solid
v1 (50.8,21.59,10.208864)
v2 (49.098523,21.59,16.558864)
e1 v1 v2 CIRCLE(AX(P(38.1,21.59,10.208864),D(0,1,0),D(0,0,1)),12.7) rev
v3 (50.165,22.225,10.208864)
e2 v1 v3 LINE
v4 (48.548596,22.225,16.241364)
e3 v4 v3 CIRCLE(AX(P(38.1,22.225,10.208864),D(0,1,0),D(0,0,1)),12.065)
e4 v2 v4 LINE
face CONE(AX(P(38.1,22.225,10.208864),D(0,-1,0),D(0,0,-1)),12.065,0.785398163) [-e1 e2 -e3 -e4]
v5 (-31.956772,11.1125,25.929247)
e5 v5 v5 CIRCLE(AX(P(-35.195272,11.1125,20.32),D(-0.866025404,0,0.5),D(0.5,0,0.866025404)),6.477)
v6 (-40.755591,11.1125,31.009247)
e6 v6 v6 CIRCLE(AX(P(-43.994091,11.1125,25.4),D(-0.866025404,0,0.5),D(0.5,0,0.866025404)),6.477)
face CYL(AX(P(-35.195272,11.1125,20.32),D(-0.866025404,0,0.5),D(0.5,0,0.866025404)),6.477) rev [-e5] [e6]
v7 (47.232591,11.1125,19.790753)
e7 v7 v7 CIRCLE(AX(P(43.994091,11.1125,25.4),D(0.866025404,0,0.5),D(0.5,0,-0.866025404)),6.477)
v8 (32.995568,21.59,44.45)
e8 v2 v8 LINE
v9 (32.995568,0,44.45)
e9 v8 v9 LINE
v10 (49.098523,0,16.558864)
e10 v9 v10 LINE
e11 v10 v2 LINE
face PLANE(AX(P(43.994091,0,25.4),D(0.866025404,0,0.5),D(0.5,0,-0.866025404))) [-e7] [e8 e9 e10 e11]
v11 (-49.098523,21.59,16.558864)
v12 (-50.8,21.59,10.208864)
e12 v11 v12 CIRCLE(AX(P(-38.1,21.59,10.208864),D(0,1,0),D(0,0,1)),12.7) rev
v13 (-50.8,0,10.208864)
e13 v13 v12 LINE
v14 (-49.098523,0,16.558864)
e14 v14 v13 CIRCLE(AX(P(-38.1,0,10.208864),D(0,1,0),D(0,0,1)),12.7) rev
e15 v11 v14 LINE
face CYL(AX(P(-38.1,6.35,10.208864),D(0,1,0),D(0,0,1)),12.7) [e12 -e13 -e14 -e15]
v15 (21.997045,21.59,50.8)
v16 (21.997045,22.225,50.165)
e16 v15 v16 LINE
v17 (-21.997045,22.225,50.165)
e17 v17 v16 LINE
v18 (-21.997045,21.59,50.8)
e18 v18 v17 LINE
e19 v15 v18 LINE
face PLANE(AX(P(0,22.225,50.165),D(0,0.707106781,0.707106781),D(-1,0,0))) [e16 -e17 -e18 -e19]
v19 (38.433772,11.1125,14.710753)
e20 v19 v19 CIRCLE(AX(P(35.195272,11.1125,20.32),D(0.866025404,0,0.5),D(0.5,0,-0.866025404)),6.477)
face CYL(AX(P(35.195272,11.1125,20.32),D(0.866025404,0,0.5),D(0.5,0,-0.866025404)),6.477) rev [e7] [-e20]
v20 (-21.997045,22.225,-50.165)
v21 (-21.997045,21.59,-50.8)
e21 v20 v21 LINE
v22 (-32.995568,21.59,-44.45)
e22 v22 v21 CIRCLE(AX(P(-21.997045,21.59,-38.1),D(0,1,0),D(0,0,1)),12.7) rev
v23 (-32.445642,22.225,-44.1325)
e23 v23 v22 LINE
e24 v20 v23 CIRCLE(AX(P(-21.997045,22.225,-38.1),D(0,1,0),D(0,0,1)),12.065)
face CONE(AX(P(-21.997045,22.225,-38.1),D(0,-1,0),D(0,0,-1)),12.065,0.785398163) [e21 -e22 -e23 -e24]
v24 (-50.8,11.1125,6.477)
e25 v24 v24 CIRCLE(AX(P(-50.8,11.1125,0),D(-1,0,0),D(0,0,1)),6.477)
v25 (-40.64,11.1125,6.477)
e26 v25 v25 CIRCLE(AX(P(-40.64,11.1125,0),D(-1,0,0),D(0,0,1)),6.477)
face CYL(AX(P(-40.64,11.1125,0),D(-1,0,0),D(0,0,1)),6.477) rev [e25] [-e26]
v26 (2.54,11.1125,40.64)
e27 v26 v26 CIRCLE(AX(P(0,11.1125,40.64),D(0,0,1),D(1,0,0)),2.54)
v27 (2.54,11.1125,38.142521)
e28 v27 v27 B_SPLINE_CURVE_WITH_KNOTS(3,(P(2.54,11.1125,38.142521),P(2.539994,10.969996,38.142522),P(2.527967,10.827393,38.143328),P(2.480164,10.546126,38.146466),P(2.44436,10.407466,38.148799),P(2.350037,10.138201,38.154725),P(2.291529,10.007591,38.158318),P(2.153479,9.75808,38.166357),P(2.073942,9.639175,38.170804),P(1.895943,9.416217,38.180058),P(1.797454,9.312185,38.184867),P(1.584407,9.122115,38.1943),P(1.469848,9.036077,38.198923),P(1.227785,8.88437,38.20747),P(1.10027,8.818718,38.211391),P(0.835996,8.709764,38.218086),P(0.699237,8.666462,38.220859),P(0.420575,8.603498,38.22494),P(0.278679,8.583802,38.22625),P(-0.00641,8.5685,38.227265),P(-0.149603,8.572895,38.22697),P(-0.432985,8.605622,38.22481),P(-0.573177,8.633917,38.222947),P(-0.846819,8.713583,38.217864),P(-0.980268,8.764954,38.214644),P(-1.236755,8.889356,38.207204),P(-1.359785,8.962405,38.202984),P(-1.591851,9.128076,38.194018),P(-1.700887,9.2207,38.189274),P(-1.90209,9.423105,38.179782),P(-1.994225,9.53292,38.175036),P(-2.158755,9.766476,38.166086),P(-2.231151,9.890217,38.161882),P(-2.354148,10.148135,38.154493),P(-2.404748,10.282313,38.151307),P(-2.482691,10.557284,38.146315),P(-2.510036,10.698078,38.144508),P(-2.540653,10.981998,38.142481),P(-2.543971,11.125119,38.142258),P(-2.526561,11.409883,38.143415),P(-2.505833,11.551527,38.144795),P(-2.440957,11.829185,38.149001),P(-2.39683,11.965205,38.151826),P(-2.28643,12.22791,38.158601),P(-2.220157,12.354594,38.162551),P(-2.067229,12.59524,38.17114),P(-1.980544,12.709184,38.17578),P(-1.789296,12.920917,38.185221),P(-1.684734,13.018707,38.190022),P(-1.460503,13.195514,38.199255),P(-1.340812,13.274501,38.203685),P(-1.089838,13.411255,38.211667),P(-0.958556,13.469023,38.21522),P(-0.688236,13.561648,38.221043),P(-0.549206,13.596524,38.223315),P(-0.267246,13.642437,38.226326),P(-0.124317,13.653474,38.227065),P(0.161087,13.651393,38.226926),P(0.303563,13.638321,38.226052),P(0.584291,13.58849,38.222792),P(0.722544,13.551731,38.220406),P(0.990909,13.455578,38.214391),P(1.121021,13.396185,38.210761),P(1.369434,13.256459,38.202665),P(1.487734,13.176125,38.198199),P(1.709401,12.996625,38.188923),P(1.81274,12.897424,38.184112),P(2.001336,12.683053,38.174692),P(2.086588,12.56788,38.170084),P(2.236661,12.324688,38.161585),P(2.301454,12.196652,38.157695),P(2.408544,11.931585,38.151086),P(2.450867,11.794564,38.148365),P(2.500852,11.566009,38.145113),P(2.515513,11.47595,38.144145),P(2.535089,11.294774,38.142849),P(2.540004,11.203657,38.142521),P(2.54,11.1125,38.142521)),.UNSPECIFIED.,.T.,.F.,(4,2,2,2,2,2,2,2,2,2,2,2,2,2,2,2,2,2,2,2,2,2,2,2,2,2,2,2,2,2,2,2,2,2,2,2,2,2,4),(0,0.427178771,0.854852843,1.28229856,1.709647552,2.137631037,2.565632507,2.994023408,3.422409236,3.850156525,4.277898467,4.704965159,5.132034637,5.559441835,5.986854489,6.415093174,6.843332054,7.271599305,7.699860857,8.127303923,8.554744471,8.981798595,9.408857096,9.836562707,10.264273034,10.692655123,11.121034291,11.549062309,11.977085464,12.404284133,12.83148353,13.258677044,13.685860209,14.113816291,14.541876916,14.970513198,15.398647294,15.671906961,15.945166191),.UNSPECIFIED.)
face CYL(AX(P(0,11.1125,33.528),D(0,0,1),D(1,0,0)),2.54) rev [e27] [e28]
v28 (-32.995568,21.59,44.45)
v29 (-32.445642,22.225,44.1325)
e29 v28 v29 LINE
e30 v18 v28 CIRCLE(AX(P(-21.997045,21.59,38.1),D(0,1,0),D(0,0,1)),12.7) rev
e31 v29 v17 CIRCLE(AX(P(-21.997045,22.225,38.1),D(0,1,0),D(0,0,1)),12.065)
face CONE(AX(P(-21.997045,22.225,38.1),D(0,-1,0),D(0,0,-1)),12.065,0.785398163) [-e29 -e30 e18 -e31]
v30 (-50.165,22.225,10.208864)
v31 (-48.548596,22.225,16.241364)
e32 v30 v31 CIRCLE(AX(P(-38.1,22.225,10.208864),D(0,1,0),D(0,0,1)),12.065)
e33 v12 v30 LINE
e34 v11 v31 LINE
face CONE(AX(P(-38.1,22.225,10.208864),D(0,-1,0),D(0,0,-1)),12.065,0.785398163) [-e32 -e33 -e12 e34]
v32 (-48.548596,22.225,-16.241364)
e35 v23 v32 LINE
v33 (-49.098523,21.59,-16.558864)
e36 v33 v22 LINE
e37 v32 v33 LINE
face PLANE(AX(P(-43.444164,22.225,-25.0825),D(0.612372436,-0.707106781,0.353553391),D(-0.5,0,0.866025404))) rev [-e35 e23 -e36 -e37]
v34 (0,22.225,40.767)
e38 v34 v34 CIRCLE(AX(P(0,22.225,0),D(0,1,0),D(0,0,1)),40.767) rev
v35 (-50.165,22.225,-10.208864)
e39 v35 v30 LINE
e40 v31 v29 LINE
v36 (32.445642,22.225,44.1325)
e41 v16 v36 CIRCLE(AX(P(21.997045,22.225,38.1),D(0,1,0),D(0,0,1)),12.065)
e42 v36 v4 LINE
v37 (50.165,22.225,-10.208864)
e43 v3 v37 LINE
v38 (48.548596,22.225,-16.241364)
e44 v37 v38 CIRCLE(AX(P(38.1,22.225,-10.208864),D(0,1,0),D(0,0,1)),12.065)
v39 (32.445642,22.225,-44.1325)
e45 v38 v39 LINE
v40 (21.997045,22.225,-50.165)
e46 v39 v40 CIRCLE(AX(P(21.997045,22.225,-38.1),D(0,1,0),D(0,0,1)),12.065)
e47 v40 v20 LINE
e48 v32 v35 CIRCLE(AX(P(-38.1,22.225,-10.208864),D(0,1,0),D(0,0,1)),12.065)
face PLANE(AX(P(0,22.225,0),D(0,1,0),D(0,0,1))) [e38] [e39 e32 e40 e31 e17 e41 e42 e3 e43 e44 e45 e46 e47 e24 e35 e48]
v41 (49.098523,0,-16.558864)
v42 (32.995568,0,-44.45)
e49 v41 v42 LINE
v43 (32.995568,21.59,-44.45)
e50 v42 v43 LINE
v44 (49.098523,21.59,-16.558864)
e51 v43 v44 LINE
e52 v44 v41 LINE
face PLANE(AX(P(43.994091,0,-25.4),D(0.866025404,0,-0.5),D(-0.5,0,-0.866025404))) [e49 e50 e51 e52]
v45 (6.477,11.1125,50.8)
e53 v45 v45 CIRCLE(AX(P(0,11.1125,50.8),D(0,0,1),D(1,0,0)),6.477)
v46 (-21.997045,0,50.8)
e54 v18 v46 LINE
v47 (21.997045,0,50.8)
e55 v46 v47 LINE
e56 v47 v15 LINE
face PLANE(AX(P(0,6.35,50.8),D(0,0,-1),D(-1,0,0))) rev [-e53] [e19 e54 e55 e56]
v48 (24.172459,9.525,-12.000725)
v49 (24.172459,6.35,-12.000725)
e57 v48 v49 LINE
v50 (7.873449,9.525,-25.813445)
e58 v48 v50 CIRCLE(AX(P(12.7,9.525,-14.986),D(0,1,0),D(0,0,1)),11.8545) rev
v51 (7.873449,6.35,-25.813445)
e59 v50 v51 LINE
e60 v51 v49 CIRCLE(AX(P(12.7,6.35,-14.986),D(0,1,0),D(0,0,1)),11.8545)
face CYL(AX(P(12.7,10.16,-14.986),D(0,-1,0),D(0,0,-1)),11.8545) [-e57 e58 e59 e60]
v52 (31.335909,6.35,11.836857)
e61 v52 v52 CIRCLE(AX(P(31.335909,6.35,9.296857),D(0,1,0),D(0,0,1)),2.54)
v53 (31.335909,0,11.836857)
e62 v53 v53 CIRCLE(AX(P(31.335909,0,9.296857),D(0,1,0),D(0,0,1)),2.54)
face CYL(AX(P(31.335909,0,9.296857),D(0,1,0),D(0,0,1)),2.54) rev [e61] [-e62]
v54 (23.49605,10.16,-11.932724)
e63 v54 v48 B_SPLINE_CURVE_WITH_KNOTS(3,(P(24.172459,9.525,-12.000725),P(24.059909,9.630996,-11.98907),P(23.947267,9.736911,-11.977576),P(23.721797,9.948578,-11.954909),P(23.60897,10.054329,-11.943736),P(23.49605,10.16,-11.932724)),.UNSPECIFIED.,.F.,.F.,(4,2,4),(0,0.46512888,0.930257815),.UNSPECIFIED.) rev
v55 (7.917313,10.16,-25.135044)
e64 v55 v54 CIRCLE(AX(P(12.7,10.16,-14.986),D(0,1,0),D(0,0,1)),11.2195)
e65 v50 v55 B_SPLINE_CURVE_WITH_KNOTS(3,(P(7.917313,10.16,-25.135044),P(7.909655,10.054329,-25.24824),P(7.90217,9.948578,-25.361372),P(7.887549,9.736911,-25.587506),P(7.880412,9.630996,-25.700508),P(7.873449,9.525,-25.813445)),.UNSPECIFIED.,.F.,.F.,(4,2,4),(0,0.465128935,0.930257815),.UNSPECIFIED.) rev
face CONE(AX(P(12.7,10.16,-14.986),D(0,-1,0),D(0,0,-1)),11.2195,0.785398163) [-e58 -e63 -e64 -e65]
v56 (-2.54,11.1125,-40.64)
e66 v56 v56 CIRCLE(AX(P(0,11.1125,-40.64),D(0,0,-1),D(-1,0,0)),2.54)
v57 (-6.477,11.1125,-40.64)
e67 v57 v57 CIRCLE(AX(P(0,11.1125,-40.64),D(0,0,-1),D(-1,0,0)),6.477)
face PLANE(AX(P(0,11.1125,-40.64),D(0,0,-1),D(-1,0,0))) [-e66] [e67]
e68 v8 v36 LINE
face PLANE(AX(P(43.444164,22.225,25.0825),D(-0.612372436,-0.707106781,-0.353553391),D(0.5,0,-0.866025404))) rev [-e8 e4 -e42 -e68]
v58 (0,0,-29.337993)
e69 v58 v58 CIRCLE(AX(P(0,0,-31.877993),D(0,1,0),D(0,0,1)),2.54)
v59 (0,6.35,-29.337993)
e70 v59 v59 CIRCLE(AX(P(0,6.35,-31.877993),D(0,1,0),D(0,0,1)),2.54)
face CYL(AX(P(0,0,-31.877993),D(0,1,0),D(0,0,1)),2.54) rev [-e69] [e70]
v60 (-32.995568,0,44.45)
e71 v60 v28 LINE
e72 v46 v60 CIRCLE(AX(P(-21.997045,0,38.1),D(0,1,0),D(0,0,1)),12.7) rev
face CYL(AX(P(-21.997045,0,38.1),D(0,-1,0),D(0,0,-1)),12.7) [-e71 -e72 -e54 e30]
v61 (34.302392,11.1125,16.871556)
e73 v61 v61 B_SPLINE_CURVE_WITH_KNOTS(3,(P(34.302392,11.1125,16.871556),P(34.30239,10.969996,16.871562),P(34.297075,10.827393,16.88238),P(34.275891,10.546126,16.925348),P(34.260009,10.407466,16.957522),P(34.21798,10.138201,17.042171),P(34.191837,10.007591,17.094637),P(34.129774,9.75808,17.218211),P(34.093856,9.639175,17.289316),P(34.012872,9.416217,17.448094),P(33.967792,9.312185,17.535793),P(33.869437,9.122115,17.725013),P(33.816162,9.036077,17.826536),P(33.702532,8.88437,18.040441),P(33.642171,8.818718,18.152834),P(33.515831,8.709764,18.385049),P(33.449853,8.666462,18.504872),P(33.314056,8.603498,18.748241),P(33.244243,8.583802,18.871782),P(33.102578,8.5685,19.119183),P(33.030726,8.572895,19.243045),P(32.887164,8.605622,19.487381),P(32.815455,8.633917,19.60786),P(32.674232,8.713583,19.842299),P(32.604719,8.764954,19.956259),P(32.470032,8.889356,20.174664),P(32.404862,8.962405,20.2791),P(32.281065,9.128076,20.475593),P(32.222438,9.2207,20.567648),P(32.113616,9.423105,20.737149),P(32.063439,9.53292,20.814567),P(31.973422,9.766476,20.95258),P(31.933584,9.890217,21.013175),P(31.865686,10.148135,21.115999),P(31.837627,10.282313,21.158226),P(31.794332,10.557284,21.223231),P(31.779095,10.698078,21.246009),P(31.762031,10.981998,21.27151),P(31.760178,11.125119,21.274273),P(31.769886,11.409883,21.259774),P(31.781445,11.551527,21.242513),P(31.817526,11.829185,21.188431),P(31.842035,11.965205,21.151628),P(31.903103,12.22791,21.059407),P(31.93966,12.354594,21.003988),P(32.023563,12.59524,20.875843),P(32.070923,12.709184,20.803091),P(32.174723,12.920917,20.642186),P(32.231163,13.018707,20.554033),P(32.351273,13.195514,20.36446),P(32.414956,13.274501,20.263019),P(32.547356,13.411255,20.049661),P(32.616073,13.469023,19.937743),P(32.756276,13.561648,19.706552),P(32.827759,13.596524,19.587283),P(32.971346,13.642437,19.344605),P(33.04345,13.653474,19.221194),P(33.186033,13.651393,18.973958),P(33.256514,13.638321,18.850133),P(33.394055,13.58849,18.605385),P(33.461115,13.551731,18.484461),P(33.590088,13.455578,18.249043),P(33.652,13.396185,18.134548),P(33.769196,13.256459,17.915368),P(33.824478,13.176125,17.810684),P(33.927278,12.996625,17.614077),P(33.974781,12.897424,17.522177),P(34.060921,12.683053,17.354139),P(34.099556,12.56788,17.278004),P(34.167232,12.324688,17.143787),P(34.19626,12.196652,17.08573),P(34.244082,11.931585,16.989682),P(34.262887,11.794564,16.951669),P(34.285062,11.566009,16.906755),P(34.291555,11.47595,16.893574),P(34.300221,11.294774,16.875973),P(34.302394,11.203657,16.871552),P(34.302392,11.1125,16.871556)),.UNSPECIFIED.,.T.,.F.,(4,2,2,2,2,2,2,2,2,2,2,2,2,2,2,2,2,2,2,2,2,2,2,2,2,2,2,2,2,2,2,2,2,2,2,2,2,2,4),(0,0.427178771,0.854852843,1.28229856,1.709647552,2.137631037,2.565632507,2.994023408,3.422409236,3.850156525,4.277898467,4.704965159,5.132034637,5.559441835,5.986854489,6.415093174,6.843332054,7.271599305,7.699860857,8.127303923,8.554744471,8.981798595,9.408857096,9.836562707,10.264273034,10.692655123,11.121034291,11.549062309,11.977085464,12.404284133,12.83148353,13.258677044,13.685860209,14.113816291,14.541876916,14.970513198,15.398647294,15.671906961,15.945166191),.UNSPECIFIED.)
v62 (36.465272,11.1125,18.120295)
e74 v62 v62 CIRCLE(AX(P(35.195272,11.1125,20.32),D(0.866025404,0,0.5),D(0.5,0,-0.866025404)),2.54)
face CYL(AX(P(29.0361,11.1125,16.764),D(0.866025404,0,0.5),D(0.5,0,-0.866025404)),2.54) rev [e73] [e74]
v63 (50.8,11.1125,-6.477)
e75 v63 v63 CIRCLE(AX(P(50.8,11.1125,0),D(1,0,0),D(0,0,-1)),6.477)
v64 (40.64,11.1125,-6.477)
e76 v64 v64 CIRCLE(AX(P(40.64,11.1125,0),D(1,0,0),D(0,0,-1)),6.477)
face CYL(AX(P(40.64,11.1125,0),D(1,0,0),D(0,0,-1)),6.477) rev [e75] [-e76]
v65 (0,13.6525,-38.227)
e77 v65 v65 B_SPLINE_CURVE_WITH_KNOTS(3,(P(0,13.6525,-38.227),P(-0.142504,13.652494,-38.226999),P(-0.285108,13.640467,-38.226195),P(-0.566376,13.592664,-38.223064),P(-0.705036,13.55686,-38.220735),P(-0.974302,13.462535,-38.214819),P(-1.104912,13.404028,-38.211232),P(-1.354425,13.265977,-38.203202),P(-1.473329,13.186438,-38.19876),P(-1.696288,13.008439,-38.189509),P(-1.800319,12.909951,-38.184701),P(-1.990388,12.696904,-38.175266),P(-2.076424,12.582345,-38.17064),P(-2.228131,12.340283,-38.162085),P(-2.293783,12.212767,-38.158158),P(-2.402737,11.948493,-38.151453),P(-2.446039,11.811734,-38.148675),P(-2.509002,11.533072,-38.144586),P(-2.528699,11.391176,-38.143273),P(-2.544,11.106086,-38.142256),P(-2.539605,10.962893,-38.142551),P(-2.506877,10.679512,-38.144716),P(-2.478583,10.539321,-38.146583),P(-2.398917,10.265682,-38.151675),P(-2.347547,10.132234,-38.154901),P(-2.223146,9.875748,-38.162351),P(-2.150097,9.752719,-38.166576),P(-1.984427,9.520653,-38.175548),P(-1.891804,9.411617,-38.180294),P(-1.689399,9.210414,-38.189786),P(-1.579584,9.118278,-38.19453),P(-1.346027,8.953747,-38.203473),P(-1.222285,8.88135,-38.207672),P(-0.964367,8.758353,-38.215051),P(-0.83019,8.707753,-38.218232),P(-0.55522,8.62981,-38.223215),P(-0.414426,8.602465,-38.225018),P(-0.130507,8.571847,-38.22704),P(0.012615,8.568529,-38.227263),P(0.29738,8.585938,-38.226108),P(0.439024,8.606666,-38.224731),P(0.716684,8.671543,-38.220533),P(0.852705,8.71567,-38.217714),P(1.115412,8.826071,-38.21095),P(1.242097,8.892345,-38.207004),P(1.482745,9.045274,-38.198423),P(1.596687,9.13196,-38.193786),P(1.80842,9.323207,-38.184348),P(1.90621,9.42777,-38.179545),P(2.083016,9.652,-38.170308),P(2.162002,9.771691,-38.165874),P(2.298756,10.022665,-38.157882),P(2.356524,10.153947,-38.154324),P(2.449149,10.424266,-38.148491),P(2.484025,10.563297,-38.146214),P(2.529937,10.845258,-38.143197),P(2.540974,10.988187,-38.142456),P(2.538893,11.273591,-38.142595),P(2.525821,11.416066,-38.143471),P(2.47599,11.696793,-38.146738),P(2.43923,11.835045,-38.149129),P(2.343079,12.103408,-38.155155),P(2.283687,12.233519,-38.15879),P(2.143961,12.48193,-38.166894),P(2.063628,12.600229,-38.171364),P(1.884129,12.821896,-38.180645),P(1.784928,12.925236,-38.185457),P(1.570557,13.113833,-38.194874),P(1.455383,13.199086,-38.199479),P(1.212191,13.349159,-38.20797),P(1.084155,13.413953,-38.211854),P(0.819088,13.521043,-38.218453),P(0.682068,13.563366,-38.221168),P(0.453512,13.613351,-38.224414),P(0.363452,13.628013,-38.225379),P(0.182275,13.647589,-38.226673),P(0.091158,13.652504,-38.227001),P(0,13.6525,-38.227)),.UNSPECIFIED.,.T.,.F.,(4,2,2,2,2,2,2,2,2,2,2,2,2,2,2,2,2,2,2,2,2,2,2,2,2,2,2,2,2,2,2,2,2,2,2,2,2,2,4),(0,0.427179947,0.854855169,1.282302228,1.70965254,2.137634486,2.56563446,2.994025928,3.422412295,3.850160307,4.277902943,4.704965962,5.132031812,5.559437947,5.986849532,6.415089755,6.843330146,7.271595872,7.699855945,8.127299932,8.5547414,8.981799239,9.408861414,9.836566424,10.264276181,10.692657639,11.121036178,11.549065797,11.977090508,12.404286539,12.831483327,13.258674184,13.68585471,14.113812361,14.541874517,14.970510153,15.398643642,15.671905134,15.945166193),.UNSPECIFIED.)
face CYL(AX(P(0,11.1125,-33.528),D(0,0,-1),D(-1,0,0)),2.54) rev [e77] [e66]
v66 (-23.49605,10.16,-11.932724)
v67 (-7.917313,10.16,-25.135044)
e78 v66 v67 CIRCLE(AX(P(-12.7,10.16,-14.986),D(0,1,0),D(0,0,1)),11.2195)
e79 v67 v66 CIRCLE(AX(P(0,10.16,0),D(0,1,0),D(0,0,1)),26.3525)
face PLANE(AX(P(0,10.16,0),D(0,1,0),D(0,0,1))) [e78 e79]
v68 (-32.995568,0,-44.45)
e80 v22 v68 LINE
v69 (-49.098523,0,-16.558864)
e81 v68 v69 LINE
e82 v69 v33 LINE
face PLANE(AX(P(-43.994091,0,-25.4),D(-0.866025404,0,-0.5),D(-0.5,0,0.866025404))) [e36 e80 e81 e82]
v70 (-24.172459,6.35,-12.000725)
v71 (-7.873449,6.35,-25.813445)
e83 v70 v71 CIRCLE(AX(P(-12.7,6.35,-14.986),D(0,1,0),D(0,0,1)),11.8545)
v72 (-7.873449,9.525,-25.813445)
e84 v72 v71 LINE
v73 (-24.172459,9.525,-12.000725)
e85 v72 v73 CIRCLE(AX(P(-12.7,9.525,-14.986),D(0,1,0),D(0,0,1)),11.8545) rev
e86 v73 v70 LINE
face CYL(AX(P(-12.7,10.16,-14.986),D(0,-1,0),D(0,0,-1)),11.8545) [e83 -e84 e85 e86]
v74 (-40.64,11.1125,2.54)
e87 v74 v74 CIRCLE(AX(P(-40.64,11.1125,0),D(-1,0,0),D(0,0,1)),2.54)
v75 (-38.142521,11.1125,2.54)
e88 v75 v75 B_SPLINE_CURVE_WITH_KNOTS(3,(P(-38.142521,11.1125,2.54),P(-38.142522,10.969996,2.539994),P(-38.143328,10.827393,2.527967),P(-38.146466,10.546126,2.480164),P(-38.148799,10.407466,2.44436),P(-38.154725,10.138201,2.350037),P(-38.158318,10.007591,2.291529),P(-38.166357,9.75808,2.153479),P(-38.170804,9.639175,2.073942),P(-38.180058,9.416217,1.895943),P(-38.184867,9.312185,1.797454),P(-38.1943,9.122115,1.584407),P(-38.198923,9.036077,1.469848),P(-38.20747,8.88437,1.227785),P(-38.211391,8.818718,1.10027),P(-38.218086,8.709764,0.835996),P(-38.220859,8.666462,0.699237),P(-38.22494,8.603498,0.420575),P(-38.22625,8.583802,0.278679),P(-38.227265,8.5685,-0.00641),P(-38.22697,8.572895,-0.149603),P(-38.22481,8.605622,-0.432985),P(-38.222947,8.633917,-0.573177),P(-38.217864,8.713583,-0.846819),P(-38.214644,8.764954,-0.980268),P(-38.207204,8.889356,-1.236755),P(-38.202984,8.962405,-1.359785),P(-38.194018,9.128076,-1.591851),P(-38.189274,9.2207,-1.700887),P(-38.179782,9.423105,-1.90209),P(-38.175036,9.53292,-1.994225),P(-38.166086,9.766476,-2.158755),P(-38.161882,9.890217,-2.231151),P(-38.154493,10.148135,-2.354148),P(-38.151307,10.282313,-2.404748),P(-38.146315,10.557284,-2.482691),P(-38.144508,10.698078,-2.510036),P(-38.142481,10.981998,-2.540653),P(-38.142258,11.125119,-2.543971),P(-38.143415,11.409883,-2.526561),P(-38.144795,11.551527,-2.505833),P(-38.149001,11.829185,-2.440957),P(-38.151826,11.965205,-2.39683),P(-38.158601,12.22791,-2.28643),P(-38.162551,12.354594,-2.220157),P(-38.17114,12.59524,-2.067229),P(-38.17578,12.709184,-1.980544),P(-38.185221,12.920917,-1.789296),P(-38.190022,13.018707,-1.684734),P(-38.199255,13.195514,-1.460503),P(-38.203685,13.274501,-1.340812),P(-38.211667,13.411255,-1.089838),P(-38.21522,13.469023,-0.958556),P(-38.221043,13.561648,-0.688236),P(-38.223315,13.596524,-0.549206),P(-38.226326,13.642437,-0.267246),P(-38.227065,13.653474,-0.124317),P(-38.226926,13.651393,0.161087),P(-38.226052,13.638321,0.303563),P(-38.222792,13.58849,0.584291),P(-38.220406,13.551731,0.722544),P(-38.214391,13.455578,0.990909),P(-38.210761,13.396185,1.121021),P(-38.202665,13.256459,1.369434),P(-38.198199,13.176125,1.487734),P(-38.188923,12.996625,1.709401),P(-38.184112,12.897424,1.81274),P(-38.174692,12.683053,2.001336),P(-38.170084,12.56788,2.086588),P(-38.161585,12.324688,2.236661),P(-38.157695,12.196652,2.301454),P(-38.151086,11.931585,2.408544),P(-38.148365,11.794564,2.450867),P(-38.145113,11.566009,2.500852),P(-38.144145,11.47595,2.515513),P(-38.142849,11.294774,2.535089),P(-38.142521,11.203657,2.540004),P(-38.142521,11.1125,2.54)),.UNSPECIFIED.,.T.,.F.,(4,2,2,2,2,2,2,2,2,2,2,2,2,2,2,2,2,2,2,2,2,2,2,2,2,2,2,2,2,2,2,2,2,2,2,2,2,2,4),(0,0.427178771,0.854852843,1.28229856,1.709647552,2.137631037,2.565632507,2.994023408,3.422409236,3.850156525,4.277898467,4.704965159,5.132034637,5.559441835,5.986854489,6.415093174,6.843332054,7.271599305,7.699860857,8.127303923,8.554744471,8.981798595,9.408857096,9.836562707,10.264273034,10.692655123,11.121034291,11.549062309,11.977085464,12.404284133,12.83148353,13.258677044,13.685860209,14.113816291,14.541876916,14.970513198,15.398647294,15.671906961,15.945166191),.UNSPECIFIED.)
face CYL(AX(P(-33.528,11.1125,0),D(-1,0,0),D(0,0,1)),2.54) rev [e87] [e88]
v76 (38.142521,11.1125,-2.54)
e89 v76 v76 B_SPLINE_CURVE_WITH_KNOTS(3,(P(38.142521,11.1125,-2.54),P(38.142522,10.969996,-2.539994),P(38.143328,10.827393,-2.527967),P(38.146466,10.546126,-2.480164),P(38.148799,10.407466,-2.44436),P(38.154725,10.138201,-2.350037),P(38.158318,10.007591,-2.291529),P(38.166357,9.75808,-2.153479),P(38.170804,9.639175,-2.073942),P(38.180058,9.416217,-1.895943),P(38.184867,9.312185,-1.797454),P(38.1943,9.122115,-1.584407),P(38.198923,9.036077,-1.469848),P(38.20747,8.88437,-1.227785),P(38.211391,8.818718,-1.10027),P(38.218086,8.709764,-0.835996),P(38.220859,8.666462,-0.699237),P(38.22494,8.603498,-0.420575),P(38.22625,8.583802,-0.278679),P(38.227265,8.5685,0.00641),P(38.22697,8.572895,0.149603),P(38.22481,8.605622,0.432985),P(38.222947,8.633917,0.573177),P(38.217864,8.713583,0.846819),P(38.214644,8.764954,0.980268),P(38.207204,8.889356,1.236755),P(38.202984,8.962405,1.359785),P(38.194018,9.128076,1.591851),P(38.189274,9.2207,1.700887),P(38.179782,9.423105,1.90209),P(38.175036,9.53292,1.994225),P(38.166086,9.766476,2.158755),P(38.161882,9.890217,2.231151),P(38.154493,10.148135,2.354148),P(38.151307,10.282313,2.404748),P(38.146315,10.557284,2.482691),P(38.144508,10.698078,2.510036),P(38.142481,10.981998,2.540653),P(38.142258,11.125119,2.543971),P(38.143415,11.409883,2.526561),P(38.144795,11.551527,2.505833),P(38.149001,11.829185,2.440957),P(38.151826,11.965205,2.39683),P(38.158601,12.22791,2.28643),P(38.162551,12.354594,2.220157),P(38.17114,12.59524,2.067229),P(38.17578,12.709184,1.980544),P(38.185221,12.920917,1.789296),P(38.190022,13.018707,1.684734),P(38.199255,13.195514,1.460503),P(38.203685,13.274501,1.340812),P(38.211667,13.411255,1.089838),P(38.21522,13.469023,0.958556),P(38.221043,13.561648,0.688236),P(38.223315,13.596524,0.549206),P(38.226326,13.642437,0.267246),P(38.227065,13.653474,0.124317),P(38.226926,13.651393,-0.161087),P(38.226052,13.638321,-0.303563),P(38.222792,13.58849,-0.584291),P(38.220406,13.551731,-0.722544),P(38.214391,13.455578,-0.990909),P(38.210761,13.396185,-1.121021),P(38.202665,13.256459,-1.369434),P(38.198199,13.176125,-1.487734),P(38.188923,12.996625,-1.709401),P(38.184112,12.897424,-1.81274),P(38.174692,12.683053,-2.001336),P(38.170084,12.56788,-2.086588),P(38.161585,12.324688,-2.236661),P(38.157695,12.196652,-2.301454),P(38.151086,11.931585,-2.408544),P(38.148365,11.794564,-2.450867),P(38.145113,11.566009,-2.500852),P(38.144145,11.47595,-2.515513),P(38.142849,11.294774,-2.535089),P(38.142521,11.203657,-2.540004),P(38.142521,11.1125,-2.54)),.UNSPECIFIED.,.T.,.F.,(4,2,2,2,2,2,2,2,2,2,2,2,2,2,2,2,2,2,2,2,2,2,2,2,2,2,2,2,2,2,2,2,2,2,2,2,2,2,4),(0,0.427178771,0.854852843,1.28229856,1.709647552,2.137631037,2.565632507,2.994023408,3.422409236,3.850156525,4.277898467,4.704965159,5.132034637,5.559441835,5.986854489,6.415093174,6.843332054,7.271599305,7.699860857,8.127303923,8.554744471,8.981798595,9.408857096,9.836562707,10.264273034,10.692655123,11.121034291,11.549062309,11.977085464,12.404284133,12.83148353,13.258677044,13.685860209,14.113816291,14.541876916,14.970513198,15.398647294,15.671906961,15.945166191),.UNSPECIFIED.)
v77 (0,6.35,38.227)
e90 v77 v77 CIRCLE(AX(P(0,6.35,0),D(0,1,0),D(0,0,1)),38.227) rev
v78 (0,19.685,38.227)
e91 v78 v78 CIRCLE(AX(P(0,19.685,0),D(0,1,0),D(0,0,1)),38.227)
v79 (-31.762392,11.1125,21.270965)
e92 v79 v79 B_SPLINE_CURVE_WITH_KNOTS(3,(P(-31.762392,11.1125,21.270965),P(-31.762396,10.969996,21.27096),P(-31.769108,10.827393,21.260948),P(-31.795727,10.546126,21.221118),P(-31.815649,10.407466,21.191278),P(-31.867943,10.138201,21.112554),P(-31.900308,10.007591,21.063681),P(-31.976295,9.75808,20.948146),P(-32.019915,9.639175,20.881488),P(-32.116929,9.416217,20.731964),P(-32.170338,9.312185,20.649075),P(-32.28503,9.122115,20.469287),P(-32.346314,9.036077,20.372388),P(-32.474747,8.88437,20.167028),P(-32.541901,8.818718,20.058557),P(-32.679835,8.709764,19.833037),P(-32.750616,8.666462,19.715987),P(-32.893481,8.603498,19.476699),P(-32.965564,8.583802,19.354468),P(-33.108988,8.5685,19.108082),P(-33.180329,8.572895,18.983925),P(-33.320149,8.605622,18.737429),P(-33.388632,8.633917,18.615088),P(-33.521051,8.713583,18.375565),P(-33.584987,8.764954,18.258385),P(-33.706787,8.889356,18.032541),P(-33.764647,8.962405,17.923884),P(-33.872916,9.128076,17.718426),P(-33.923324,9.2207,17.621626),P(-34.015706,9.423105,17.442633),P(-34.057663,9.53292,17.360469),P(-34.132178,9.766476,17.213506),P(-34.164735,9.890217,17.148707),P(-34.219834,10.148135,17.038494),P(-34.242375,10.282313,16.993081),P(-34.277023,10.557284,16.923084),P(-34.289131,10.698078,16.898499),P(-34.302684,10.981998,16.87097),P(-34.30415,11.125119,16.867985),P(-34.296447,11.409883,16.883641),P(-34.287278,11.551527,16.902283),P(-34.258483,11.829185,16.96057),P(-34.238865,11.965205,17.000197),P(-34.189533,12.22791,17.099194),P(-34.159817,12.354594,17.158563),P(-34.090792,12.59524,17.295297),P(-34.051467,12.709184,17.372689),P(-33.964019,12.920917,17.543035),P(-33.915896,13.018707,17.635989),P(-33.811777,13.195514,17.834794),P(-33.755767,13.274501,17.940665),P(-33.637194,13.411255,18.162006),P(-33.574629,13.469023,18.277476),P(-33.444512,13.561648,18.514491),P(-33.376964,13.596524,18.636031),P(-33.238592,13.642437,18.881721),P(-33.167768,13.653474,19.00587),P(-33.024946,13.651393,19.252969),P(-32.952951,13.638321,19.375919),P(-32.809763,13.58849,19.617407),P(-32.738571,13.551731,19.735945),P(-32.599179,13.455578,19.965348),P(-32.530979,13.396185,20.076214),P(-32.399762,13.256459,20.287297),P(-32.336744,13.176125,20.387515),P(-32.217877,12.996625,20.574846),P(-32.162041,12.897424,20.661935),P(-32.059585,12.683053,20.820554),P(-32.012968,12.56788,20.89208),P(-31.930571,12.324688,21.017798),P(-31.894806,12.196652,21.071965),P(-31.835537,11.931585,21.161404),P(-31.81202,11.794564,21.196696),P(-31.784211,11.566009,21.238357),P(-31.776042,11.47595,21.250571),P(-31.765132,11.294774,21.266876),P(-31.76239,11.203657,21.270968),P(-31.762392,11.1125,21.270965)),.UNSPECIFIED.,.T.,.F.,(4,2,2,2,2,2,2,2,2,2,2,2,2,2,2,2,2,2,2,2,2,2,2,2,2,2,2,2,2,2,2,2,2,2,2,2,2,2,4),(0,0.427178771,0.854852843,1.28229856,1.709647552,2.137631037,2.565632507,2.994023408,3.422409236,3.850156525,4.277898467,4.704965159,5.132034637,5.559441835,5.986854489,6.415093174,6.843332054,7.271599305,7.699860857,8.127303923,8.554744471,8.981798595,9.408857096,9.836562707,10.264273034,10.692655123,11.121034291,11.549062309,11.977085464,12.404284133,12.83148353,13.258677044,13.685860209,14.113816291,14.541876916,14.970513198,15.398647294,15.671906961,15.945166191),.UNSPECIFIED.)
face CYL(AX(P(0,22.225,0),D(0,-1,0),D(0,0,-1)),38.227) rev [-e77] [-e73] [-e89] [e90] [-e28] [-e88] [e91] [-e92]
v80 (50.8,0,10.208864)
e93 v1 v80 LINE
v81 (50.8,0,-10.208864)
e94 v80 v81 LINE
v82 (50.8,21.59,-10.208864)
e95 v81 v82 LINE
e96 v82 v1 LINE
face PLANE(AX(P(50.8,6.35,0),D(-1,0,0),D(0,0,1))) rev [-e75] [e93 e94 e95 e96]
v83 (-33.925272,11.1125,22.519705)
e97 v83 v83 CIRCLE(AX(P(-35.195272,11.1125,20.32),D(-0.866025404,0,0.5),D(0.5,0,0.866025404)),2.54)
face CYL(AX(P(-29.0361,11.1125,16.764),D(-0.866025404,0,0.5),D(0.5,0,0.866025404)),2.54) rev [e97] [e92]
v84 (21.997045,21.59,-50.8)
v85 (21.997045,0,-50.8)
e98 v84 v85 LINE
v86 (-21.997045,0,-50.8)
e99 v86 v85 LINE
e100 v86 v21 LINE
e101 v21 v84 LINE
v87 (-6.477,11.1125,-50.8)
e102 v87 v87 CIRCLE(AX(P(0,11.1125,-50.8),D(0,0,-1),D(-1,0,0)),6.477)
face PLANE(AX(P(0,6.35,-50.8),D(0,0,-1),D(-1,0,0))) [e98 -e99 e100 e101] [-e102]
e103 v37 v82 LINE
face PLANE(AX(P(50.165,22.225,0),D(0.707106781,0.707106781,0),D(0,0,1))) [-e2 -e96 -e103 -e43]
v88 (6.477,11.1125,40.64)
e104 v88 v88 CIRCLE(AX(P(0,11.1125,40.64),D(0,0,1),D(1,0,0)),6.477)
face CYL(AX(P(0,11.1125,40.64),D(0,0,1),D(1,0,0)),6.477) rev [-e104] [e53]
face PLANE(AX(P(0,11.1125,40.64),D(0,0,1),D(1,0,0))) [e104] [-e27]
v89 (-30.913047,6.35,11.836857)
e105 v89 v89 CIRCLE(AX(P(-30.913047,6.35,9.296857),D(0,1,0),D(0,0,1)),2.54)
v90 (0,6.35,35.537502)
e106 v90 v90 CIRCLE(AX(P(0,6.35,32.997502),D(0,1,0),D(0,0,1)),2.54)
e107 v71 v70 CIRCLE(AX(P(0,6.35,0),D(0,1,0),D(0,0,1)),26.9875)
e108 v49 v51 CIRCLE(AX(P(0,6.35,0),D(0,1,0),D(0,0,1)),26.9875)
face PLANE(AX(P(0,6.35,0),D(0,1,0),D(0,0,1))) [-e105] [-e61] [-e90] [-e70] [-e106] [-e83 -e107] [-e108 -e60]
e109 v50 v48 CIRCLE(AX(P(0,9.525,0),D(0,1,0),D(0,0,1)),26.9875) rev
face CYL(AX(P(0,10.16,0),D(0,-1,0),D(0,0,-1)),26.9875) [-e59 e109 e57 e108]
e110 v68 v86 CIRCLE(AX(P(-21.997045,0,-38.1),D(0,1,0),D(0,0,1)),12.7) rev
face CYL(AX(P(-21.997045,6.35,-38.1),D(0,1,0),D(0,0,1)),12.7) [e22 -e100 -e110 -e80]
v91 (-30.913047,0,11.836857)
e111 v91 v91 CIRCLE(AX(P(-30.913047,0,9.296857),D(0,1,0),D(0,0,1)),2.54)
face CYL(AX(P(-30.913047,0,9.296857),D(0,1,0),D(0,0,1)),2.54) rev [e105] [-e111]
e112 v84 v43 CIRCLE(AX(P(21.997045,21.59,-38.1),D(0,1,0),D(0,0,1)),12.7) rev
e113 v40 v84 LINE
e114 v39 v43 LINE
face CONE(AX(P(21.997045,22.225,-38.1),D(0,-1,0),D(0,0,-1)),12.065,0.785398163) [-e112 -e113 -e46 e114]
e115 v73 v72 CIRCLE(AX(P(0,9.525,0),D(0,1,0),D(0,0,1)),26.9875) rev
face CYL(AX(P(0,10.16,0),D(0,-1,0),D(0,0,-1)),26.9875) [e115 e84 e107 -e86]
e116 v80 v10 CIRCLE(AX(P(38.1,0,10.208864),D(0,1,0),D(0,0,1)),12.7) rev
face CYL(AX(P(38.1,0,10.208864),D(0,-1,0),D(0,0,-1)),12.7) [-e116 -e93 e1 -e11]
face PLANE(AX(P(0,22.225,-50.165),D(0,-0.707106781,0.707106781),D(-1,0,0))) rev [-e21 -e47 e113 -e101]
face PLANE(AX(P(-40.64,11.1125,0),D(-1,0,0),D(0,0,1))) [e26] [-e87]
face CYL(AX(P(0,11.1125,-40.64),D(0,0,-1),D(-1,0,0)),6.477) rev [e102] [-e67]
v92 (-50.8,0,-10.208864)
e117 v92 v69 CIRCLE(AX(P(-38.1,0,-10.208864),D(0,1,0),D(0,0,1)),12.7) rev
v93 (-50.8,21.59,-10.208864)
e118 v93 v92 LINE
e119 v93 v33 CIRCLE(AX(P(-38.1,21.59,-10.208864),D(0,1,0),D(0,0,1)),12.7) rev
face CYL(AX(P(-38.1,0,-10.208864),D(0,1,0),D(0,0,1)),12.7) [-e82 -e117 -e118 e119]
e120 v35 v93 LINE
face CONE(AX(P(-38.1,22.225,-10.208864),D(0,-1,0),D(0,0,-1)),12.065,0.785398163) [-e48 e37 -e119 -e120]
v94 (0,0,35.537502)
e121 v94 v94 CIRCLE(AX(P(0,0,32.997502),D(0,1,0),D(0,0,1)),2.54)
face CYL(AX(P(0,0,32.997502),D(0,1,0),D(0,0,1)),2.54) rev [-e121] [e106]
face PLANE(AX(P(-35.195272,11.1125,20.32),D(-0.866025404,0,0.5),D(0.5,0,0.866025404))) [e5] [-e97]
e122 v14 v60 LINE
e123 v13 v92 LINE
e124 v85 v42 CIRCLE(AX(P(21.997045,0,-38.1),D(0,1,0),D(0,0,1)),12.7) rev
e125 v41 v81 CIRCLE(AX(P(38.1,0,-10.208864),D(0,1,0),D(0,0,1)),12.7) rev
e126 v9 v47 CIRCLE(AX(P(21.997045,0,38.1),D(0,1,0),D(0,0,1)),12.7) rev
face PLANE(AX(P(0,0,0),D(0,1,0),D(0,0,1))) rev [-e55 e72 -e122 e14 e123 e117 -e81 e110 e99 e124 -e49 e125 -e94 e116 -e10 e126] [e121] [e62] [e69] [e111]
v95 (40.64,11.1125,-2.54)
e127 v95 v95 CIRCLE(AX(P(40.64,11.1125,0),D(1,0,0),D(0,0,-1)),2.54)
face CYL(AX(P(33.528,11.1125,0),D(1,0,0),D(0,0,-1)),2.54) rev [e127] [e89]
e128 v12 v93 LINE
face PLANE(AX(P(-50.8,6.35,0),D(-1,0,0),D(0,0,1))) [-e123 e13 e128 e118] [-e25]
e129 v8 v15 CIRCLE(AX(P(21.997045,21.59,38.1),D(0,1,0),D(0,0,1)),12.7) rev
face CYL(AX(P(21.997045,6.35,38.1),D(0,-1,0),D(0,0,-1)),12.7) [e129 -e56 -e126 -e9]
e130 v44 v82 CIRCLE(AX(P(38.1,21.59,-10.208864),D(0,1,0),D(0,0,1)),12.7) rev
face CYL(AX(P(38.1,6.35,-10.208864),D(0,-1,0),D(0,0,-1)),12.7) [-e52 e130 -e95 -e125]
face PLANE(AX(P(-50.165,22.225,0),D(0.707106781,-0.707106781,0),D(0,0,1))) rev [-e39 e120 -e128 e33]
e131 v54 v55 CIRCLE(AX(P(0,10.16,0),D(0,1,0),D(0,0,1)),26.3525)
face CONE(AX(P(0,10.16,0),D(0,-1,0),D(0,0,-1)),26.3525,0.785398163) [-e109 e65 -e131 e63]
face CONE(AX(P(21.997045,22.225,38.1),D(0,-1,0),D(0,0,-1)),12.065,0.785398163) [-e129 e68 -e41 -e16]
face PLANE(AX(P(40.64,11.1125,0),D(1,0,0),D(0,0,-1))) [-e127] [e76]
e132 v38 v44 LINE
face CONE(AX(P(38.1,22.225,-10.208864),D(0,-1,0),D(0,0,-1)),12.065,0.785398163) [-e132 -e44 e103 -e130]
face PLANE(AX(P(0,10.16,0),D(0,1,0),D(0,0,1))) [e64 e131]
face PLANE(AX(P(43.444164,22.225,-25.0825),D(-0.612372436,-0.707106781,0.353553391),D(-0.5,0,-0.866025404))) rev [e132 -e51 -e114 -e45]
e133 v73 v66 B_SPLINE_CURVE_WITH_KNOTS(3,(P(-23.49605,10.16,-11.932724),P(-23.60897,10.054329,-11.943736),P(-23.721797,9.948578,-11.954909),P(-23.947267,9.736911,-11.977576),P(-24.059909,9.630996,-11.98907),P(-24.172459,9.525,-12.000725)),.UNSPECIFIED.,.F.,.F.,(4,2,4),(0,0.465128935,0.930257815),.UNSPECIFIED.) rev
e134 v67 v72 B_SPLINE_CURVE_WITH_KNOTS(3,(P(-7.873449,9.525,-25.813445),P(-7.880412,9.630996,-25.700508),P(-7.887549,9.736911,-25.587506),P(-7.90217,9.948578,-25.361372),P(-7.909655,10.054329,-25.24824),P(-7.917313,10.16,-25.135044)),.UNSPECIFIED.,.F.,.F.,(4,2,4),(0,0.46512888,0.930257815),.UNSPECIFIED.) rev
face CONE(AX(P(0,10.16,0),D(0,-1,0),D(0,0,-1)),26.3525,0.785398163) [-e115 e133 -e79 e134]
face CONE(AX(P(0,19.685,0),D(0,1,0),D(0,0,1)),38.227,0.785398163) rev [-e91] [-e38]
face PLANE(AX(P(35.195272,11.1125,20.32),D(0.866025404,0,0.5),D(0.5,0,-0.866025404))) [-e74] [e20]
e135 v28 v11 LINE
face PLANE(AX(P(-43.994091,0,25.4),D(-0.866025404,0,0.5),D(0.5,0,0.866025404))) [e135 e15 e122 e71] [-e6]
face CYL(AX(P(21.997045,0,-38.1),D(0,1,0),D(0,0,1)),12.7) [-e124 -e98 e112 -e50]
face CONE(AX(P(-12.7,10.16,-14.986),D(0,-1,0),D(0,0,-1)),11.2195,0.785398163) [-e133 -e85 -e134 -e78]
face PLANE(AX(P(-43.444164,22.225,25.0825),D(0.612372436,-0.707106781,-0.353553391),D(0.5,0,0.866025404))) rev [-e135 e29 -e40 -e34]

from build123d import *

# Parameters (mm, degrees)
SKETCH1_W               = 101.6
SKETCH1_H               = 101.6
SKETCH1_R               = 38.394
SKETCH1_R_2             = 3.175
SKETCH1_R_3             = 11.8745
SKETCH1_R_4             = 4.1275
BOSS_EXTRUDE1_DEPTH     = 6.35
SKETCH2_W               = 101.6
SKETCH2_H               = 101.6
SKETCH2_R               = 38.227
BOSS_EXTRUDE2_DEPTH     = 15.875
BOSS_EXTRUDE3_DEPTH     = 3.81
SKETCH8_R               = 6.477
CUT_EXTRUDE1_DEPTH      = 10.16
CUT_EXTRUDE5_DEPTH      = 76.201267443
CIRPATTERN1_START       = 40.64
CIRPATTERN1_OUTLINE_R   = 6.477
CIRPATTERN1_DEPTH       = 10.16
CIRPATTERN1_START_2     = -50.8
CIRPATTERN1_2_OUTLINE_R = 6.477
CIRPATTERN1_2_DEPTH     = 10.16
CIRPATTERN1_3_OUTLINE_R = 6.477
CIRPATTERN1_3_DEPTH     = 10.16
CIRPATTERN1_4_OUTLINE_R = 6.477
CIRPATTERN1_4_DEPTH     = 10.16
CIRPATTERN1_5_OUTLINE_R = 6.477
CIRPATTERN1_5_DEPTH     = 10.16
SKETCH13_R              = 2.54
CUT_EXTRUDE4_DEPTH      = 17.272
CIRPATTERN4_START       = 38.142521171
CIRPATTERN4_OUTLINE_R   = 2.54
CIRPATTERN4_DEPTH       = 2.497478829
CIRPATTERN4_START_2     = -40.64
CIRPATTERN4_2_OUTLINE_R = 2.54
CIRPATTERN4_2_DEPTH     = 81.28
CIRPATTERN4_3_OUTLINE_R = 2.54
CIRPATTERN4_3_DEPTH     = 2.497478829
CIRPATTERN4_4_OUTLINE_R = 2.54
CIRPATTERN4_4_DEPTH     = 2.497478829
SKETCH12_R              = 2.54
CUT_EXTRUDE3_DEPTH      = 74.575101958
FILLET1_R               = 12.7
CHAMFER1_SIZE           = 2.54
CHAMFER2_SIZE           = 0.635
CHAMFER3_SIZE           = 0.635


# Read off the part's stored shape, not the designer's step: Boss-Extrude3, CirPattern1, CirPattern4
with BuildPart() as part:
    # Sketch1 → Boss-Extrude1 (new body)
    # profile 1 of 9: a face of its own
    with BuildSketch(Plane(origin=(0, 0, 0), x_dir=(1, 0, 0), z_dir=(0, 1, 0))):
        Rectangle(SKETCH1_W, SKETCH1_H)
        Circle(SKETCH1_R, mode=Mode.SUBTRACT)
    # profile 2 of 9: a face of its own
    with BuildSketch(Plane(origin=(0, 0, 0), x_dir=(1, 0, 0), z_dir=(0, 1, 0))):
        Circle(SKETCH1_R)
        with Locations((0, 30.226)):
            Circle(SKETCH1_R_2, mode=Mode.SUBTRACT)
        with Locations((12.7, 20.066)):
            Circle(SKETCH1_R_3, mode=Mode.SUBTRACT)
        with Locations((0, 9.906)):
            Circle(SKETCH1_R_2, mode=Mode.SUBTRACT)
        with Locations((0, -14.605)):
            Circle(SKETCH1_R_4, mode=Mode.SUBTRACT)
        with Locations((-12.7, 20.066)):
            Circle(SKETCH1_R_3, mode=Mode.SUBTRACT)
        with Locations((25.4, 2.6162)):
            Circle(SKETCH1_R_2, mode=Mode.SUBTRACT)
        with Locations((-25.4, 2.6162)):
            Circle(SKETCH1_R_2, mode=Mode.SUBTRACT)
    # profile 3 of 9: a face of its own
    with BuildSketch(Plane(origin=(0, 0, 0), x_dir=(1, 0, 0), z_dir=(0, 1, 0))):
        with Locations((-25.4, 2.6162)):
            Circle(SKETCH1_R_2)
    # profile 4 of 9: a face of its own
    with BuildSketch(Plane(origin=(0, 0, 0), x_dir=(1, 0, 0), z_dir=(0, 1, 0))):
        with Locations((0, 9.906)):
            Circle(SKETCH1_R_2)
    # profile 5 of 9: a face of its own
    with BuildSketch(Plane(origin=(0, 0, 0), x_dir=(1, 0, 0), z_dir=(0, 1, 0))):
        with Locations((0, 30.226)):
            Circle(SKETCH1_R_2)
    # profile 6 of 9: a face of its own
    with BuildSketch(Plane(origin=(0, 0, 0), x_dir=(1, 0, 0), z_dir=(0, 1, 0))):
        with Locations((12.7, 20.066)):
            Circle(SKETCH1_R_3)
    # profile 7 of 9: a face of its own
    with BuildSketch(Plane(origin=(0, 0, 0), x_dir=(1, 0, 0), z_dir=(0, 1, 0))):
        with Locations((-12.7, 20.066)):
            Circle(SKETCH1_R_3)
    # profile 8 of 9: a face of its own
    with BuildSketch(Plane(origin=(0, 0, 0), x_dir=(1, 0, 0), z_dir=(0, 1, 0))):
        with Locations((0, -14.605)):
            Circle(SKETCH1_R_4)
    # profile 9 of 9: a face of its own
    with BuildSketch(Plane(origin=(0, 0, 0), x_dir=(1, 0, 0), z_dir=(0, 1, 0))):
        with Locations((25.4, 2.6162)):
            Circle(SKETCH1_R_2)
    extrude(amount=BOSS_EXTRUDE1_DEPTH)

    # Sketch2 → Boss-Extrude2 (add)
    with BuildSketch(Plane(origin=(0, 6.35, 0), x_dir=(1, 0, 0), z_dir=(0, 1, 0))):
        Rectangle(SKETCH2_W, SKETCH2_H)
        with Locations(Location((0, 0, 0), (0, 0, 270))):
            Circle(SKETCH2_R, mode=Mode.SUBTRACT)
    extrude(amount=BOSS_EXTRUDE2_DEPTH)

    # Boss-Extrude3 outline → Boss-Extrude3 (add)
    with BuildSketch(Plane(origin=(0, 6.35, 0), x_dir=(1, 0, 0), z_dir=(0, 1, 0))):
        with BuildLine():
            ThreePointArc((-24.172458524, 12.000725193), (-5.035808562, 5.942254103), (-7.873448726, 25.813445361))
            ThreePointArc((-7.873448726, 25.813445361), (-17.448004255, 20.58864502), (-24.172458524, 12.000725193))
        make_face()
        with BuildLine():
            ThreePointArc((24.172458524, 12.000725193), (17.448004255, 20.58864502), (7.873448726, 25.813445361))
            ThreePointArc((7.873448726, 25.813445361), (5.035808562, 5.942254103), (24.172458524, 12.000725193))
        make_face()
    extrude(amount=BOSS_EXTRUDE3_DEPTH)

    # Sketch8 → Cut-Extrude1 (cut)
    with BuildSketch(Plane(origin=(0, 0, -50.8), x_dir=(-1, 0, 0), z_dir=(0, 0, -1))):
        with Locations((0, 11.1125)):
            Circle(SKETCH8_R)
    extrude(amount=-CUT_EXTRUDE1_DEPTH, mode=Mode.SUBTRACT)

    # Sketch15 → Cut-Extrude5 (cut, through all)
    with BuildSketch(Plane(origin=(0, 22.225, 0), x_dir=(1, 0, 0), z_dir=(0, 1, 0))):
        Polygon((-50.8, 13.611818976), (-29.329393675, 50.8), (-50.8, 50.8), align=None)
        Polygon((-58.65878735, 0), (-50.8, 13.611818976), (-50.8, 50.8), (-58.65878735, 50.8), align=None)
        Polygon((-50.8, -13.611818976), (-50.8, 13.611818976), (-58.65878735, 0), align=None)
        Polygon((-50.8, -13.611818976), (-58.65878735, 0), (-58.65878735, -50.8), (-50.8, -50.8), align=None)
        Polygon((-29.329393675, -50.8), (-50.8, -13.611818976), (-50.8, -50.8), align=None)
        Polygon((50.8, -50.8), (50.8, -13.611818976), (29.329393675, -50.8), align=None)
        Polygon((58.65878735, -50.8), (58.65878735, 0), (50.8, -13.611818976), (50.8, -50.8), align=None)
        Polygon((58.65878735, 0), (50.8, 13.611818976), (50.8, -13.611818976), align=None)
        Polygon((50.8, 50.8), (50.8, 13.611818976), (58.65878735, 0), (58.65878735, 50.8), align=None)
        Polygon((50.8, 50.8), (29.329393675, 50.8), (50.8, 13.611818976), align=None)
    extrude(amount=-CUT_EXTRUDE5_DEPTH, mode=Mode.SUBTRACT)

    # CirPattern1 outline → CirPattern1 (cut)
    with BuildSketch(Plane.XY.offset(CIRPATTERN1_START)):
        with Locations((0, 11.1125)):
            Circle(CIRPATTERN1_OUTLINE_R)
    extrude(amount=CIRPATTERN1_DEPTH, mode=Mode.SUBTRACT)

    # CirPattern1 2 outline → CirPattern1 2 (cut)
    with BuildSketch(Plane(origin=(0, 0, 0), x_dir=(0.49999999999999195, 0, 0.8660254037844434), z_dir=(0.8660254037844433, 0, -0.4999999999999921)).offset(CIRPATTERN1_START_2)):
        with Locations((0, -11.1125)):
            Circle(CIRPATTERN1_2_OUTLINE_R)
    extrude(amount=CIRPATTERN1_2_DEPTH, mode=Mode.SUBTRACT)

    # CirPattern1 3 outline → CirPattern1 3 (cut)
    with BuildSketch(Plane(origin=(0, 0, 0), x_dir=(0.500000000000004, 0, -0.8660254037844363), z_dir=(0.8660254037844363, 0, 0.5000000000000042)).offset(CIRPATTERN1_START)):
        with Locations((0, 11.1125)):
            Circle(CIRPATTERN1_3_OUTLINE_R)
    extrude(amount=CIRPATTERN1_3_DEPTH, mode=Mode.SUBTRACT)

    # CirPattern1 4 outline → CirPattern1 4 (cut)
    with BuildSketch(Plane.YZ.offset(CIRPATTERN1_START_2)):
        with Locations((11.1125, 0)):
            Circle(CIRPATTERN1_4_OUTLINE_R)
    extrude(amount=CIRPATTERN1_4_DEPTH, mode=Mode.SUBTRACT)

    # CirPattern1 5 outline → CirPattern1 5 (cut)
    with BuildSketch(Plane.YZ.offset(CIRPATTERN1_START)):
        with Locations((11.1125, 0)):
            Circle(CIRPATTERN1_5_OUTLINE_R)
    extrude(amount=CIRPATTERN1_5_DEPTH, mode=Mode.SUBTRACT)

    # Sketch13 → Cut-Extrude4 (cut)
    with BuildSketch(Plane(origin=(0, 0, -50.8), x_dir=(-1, 0, 0), z_dir=(0, 0, -1))):
        with Locations((0, 11.1125)):
            Circle(SKETCH13_R)
    extrude(amount=-CUT_EXTRUDE4_DEPTH, mode=Mode.SUBTRACT)

    # CirPattern4 outline → CirPattern4 (cut)
    with BuildSketch(Plane.XY.offset(CIRPATTERN4_START)):
        with Locations((0, 11.1125)):
            Circle(CIRPATTERN4_OUTLINE_R)
    extrude(amount=CIRPATTERN4_DEPTH, mode=Mode.SUBTRACT)

    # CirPattern4 2 outline → CirPattern4 2 (cut)
    with BuildSketch(Plane.YZ.offset(CIRPATTERN4_START_2)):
        with Locations((11.1125, 0)):
            Circle(CIRPATTERN4_2_OUTLINE_R)
    extrude(amount=CIRPATTERN4_2_DEPTH, mode=Mode.SUBTRACT)

    # CirPattern4 3 outline → CirPattern4 3 (cut)
    with BuildSketch(Plane(origin=(0, 0, 0), x_dir=(0.49999999999999195, 0, -0.8660254037844434), z_dir=(0.8660254037844433, 0, 0.4999999999999921)).offset(CIRPATTERN4_START)):
        with Locations((0, 11.1125)):
            Circle(CIRPATTERN4_3_OUTLINE_R)
    extrude(amount=CIRPATTERN4_3_DEPTH, mode=Mode.SUBTRACT)

    # CirPattern4 4 outline → CirPattern4 4 (cut)
    with BuildSketch(Plane(origin=(0, 0, 0), x_dir=(0.500000000000004, 0, 0.8660254037844363), z_dir=(0.8660254037844363, 0, -0.5000000000000042)).offset(CIRPATTERN4_START_2)):
        with Locations((0, -11.1125)):
            Circle(CIRPATTERN4_4_OUTLINE_R)
    extrude(amount=CIRPATTERN4_4_DEPTH, mode=Mode.SUBTRACT)

    # Sketch12 → Cut-Extrude3 (cut, through all)
    with BuildSketch(Plane(origin=(0, 6.35, 0), x_dir=(1, 0, 0), z_dir=(0, 1, 0))):
        with Locations(Location((-30.913047265, -9.296856721, 0), (0, 0, 270))):
            Circle(SKETCH12_R)
        with Locations(Location((31.335909349, -9.296856721, 0), (0, 0, 270))):
            Circle(SKETCH12_R)
        with Locations(Location((0, -32.997501828, 0), (0, 0, 270))):
            Circle(SKETCH12_R)
        with Locations(Location((0, 31.87799304, 0), (0, 0, 270))):
            Circle(SKETCH12_R)
    extrude(amount=-CUT_EXTRUDE3_DEPTH, mode=Mode.SUBTRACT)

    # Fillet1
    fillet1_edges = [part.edges().sort_by_distance(p)[0] for p in [
        (-29.329393675, 11.1125, -50.8),
        (-50.8, 11.1125, -13.611818976),
        (-50.8, 11.1125, 13.611818976),
        (-29.329393675, 11.1125, 50.8),
        (29.329393675, 11.1125, -50.8),
        (29.329393675, 11.1125, 50.8),
        (50.8, 11.1125, 13.611818976),
        (50.8, 11.1125, -13.611818976),
    ]]
    fillet(fillet1_edges, radius=FILLET1_R)

    # Chamfer1
    chamfer1_edges = [part.edges().sort_by_distance(p)[0] for p in [
        (0, 22.225, -38.227),
    ]]
    chamfer(chamfer1_edges, length=CHAMFER1_SIZE)

    # Chamfer2
    chamfer2_edges = [part.edges().sort_by_distance(p)[0] for p in [
        (-5.035808562, 10.16, -5.942254103),
        (-17.448004255, 10.16, -20.58864502),
        (5.035808562, 10.16, -5.942254103),
        (17.448004255, 10.16, -20.58864502),
    ]]
    chamfer(chamfer2_edges, length=CHAMFER2_SIZE)

    # Chamfer3
    chamfer3_edges = [part.edges().sort_by_distance(p)[0] for p in [
        (-41.047045256, 22.225, 30.504432116),
        (0, 22.225, -50.8),
        (-41.047045256, 22.225, -30.504432116),
        (-50.8, 22.225, 0),
        (0, 22.225, 50.8),
        (41.047045256, 22.225, 30.504432116),
        (50.8, 22.225, 0),
        (41.047045256, 22.225, -30.504432116),
        (28.347045256, 22.225, 49.098522628),
        (50.367257994, 22.225, 13.495866104),
        (50.367257994, 22.225, -13.495866104),
        (28.347045256, 22.225, -49.098522628),
        (-28.347045256, 22.225, -49.098522628),
        (-50.367257994, 22.225, -13.495866104),
        (-50.367257994, 22.225, 13.495866104),
        (-28.347045256, 22.225, 49.098522628),
    ]]
    chamfer(chamfer3_edges, length=CHAMFER3_SIZE)


solid = part.part
